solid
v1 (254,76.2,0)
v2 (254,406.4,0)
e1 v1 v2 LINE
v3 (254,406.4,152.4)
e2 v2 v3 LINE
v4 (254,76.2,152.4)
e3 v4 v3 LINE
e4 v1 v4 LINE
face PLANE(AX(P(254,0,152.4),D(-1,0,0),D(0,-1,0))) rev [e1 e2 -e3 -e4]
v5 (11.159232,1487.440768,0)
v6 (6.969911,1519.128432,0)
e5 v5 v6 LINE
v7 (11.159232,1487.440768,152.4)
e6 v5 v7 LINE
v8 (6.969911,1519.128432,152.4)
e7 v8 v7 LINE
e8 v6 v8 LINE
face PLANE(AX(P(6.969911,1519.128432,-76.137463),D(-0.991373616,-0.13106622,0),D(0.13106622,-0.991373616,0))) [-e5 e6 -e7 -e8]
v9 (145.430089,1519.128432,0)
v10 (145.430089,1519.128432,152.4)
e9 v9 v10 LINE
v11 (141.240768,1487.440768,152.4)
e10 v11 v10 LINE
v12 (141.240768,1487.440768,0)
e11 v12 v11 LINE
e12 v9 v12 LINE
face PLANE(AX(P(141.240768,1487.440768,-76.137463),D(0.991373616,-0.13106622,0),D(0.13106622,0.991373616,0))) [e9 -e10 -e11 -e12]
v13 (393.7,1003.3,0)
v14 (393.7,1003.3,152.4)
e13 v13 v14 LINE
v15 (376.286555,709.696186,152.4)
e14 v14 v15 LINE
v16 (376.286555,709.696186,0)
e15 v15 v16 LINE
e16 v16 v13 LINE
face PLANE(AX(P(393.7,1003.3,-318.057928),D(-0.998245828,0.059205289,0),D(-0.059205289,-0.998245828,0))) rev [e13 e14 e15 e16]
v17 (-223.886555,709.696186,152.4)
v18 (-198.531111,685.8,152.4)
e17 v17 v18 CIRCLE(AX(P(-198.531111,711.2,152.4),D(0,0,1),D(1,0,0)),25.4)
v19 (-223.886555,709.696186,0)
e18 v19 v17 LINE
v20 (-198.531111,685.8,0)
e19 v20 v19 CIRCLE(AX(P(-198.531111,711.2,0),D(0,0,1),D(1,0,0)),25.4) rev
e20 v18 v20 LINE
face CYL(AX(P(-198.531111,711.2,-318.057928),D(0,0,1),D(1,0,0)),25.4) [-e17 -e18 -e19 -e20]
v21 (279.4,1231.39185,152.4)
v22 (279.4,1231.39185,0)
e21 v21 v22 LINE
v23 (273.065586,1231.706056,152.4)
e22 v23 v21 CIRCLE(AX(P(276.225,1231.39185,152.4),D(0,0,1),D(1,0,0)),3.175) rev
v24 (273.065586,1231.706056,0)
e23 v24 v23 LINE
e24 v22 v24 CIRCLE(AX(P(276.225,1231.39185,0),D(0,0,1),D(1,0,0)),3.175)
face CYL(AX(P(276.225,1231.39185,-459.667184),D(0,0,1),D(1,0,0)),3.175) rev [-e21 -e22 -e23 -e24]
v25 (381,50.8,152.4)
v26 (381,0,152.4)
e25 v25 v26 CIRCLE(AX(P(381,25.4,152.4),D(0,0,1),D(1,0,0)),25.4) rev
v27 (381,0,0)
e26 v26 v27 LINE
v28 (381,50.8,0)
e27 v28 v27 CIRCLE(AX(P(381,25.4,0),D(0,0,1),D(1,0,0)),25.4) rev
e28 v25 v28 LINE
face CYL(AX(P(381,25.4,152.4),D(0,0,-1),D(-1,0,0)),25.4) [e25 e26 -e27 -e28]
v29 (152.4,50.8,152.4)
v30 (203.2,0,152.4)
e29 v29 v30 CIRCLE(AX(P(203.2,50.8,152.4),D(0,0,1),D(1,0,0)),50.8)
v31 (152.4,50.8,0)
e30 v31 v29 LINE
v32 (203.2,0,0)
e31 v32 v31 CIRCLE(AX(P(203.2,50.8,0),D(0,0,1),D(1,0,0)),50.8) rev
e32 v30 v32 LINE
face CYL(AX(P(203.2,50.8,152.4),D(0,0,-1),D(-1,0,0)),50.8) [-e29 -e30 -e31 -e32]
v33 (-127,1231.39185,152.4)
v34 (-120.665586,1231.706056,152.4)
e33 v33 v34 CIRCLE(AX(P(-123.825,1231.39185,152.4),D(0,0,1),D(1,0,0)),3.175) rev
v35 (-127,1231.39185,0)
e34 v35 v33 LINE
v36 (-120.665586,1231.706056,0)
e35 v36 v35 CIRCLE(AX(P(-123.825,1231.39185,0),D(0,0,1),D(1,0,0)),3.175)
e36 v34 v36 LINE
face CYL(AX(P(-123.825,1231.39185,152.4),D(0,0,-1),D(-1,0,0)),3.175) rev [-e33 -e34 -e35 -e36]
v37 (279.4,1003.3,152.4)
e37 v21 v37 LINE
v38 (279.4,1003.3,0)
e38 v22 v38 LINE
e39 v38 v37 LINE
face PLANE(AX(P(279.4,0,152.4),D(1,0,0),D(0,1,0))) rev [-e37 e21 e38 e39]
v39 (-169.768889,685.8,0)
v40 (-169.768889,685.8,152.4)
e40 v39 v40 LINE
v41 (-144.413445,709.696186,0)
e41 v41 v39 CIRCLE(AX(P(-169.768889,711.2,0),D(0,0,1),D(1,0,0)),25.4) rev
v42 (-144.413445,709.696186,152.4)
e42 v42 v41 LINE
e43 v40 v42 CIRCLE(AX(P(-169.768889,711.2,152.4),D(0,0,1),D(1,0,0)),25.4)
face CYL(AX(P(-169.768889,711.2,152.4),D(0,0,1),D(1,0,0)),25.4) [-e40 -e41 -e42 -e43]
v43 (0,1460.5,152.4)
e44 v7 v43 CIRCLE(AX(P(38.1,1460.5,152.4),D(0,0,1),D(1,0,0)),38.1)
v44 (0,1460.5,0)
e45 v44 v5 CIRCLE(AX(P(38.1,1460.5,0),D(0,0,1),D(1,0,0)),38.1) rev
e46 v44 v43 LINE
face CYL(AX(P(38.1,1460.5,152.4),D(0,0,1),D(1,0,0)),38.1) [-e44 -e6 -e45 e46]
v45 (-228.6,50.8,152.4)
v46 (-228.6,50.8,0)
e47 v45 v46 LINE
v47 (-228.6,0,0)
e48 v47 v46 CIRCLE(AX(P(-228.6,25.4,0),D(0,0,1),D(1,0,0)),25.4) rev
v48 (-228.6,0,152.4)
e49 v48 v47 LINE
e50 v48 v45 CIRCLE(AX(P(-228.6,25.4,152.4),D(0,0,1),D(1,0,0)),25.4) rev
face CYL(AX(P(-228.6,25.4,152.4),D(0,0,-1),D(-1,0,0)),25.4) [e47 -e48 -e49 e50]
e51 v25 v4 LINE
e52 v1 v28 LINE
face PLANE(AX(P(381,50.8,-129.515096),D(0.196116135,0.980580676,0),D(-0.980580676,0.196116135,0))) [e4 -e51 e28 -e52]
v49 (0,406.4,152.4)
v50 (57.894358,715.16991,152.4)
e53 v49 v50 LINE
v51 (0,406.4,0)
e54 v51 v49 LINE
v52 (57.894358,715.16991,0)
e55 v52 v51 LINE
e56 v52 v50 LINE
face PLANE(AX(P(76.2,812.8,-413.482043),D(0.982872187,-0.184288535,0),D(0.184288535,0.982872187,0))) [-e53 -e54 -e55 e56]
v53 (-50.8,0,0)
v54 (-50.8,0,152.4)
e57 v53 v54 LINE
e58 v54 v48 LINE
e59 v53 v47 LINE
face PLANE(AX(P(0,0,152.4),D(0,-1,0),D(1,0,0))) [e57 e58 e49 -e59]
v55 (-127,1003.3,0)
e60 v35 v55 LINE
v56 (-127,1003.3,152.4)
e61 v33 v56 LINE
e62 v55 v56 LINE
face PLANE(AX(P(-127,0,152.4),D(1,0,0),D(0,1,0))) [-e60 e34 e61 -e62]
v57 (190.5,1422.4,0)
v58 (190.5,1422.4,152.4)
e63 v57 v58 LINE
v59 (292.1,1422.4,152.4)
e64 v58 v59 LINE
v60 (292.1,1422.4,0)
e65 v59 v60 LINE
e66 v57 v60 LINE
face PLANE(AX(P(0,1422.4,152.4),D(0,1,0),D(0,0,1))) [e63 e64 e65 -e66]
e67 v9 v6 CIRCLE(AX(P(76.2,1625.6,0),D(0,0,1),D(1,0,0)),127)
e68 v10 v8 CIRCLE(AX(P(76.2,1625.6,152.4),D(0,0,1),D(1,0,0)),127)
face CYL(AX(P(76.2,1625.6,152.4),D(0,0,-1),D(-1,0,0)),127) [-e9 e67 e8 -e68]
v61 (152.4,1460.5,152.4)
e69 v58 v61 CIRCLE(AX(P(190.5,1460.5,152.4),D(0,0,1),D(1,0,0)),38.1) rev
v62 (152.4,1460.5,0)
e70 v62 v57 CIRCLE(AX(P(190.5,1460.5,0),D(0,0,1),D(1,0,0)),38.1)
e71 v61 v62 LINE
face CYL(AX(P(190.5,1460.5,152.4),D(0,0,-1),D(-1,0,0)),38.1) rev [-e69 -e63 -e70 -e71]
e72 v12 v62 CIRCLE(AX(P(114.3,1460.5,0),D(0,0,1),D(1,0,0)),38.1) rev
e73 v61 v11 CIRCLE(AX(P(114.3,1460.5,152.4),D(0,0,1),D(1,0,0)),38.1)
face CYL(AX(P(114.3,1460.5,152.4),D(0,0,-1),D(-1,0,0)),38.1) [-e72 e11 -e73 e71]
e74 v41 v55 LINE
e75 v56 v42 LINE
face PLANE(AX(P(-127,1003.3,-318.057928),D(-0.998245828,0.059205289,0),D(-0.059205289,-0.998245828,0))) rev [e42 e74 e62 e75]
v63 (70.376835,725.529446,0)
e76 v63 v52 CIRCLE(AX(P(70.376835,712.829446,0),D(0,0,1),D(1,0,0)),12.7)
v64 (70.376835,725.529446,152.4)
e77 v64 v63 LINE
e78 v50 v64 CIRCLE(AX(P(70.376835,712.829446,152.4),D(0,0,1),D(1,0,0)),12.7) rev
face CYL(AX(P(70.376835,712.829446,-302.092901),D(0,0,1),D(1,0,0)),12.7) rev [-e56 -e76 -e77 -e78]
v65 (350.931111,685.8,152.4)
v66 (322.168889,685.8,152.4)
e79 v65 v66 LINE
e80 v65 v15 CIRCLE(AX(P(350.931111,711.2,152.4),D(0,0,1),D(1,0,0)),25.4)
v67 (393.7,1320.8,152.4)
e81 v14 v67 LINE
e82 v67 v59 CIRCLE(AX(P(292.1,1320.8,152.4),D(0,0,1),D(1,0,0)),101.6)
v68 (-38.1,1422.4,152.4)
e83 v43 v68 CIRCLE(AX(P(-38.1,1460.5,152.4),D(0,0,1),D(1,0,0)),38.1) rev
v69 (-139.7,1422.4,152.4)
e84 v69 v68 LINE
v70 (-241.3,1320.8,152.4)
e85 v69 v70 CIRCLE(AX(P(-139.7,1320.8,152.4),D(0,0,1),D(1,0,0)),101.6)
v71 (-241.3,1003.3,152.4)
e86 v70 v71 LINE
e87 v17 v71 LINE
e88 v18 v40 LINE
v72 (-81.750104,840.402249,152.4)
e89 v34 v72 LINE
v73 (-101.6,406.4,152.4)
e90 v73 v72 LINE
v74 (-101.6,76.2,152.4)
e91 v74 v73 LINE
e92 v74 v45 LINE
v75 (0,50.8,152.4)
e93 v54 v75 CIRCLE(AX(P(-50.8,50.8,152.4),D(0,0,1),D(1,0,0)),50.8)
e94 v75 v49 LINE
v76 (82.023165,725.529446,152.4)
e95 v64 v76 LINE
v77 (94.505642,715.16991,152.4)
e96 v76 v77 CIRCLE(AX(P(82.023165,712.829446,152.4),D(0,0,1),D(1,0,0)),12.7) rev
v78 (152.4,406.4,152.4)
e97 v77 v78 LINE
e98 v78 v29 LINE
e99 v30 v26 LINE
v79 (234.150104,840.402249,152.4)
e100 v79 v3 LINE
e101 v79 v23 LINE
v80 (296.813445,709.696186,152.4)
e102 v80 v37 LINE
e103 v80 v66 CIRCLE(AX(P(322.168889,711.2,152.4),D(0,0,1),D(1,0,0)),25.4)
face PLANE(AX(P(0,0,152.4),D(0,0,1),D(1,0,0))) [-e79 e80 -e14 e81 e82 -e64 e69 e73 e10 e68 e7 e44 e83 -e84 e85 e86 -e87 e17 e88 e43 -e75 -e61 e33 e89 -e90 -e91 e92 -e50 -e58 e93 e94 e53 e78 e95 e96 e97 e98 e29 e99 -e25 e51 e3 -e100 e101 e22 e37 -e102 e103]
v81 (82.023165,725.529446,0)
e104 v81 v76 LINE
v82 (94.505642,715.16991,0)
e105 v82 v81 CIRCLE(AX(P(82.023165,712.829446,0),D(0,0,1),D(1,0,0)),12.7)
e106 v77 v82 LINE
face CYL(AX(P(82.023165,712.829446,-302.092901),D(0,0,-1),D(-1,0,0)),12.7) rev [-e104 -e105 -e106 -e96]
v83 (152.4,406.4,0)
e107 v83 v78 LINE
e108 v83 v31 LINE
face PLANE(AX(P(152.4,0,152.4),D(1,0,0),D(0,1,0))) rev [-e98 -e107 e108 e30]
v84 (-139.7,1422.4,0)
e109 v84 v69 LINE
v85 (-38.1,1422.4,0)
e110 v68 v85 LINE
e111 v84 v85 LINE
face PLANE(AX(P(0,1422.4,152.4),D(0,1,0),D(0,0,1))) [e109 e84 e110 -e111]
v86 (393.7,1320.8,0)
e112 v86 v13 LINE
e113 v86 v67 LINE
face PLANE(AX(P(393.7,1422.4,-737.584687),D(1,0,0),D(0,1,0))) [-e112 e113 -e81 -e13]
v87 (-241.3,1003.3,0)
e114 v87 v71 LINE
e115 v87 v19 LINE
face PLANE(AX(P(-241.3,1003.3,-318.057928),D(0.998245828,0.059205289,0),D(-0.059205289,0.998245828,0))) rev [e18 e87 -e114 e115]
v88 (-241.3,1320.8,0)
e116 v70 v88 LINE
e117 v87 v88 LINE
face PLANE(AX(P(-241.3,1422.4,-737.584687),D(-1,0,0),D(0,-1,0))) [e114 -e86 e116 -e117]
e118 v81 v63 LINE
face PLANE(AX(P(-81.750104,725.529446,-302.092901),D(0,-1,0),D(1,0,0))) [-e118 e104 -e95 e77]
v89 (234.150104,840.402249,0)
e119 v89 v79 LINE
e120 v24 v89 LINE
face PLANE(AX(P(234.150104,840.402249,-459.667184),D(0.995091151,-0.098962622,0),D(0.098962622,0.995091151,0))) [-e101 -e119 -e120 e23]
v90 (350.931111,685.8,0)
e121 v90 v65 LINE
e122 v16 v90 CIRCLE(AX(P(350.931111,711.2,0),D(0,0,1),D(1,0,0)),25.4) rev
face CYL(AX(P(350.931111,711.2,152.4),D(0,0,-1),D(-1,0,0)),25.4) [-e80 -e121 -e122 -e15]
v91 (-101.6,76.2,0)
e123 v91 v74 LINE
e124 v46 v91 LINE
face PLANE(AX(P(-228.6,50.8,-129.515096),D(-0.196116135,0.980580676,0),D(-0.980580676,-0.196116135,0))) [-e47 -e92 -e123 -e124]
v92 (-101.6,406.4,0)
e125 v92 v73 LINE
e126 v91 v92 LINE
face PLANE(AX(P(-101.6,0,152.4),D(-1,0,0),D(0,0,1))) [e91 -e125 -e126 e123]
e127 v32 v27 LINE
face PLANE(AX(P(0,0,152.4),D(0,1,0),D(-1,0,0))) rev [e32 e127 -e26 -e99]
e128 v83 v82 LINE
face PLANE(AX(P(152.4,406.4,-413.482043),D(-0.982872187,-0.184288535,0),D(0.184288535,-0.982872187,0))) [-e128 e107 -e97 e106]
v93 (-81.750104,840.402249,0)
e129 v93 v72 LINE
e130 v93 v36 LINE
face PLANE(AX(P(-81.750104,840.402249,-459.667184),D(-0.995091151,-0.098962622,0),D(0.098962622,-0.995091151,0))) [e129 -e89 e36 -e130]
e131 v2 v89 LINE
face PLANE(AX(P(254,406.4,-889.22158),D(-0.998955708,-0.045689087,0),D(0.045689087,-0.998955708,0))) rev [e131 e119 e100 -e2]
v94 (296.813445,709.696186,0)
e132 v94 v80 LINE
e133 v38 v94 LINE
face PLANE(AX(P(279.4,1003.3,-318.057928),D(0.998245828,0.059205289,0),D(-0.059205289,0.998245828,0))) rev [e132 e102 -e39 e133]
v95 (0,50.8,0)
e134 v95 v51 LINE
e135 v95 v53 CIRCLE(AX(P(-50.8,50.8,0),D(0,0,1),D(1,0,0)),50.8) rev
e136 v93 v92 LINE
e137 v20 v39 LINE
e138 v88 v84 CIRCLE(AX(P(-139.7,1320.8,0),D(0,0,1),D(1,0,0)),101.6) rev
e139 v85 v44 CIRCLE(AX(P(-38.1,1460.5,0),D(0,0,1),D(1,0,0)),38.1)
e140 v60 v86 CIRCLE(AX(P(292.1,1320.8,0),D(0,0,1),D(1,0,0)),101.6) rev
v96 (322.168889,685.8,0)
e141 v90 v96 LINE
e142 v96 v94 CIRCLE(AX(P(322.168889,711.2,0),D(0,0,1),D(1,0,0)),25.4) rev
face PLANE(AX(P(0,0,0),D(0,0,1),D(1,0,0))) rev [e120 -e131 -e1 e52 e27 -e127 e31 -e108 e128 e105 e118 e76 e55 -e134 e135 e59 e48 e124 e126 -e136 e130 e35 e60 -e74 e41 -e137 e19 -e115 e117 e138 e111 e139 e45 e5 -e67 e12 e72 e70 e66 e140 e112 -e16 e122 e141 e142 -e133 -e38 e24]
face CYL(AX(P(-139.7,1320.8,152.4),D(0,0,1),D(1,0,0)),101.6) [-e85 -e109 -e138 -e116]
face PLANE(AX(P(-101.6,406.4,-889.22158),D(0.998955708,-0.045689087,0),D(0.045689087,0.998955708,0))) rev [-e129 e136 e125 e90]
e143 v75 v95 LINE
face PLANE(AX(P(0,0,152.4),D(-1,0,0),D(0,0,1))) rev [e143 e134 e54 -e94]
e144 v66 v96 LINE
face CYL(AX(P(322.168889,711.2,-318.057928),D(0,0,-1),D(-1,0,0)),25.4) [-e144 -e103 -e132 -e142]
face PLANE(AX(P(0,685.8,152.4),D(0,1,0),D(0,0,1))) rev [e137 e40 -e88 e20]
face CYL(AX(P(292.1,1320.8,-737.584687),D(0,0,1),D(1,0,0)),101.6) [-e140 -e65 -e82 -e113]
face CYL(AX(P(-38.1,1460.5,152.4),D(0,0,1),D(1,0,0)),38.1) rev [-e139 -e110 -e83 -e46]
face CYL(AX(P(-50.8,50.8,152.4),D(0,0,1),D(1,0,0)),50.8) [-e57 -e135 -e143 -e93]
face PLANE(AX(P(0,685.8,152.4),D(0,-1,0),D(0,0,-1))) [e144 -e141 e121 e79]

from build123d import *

# Parameters (mm, degrees)
SKETCH1_R            = 127
SKETCH1_W            = 76.2
SKETCH1_H            = 660.4
SKETCH1_W_2          = 101.6
SKETCH1_H_2          = 762
SKETCH1_W_3          = 228.6
SKETCH1_H_3          = 50.8
SKETCH1_W_4          = 152.4
SKETCH1_H_4          = 76.2
BOSS_EXTRUDE1_DEPTH  = 152.4
SKETCH2_W            = 406.4
SKETCH2_H            = 50.8
BOSS_EXTRUDE2_DEPTH  = 152.4
BOSS_EXTRUDE3_DEPTH  = 152.4
BOSS_EXTRUDE4_DEPTH  = 152.4
BOSS_EXTRUDE5_DEPTH  = 152.4
CUT_EXTRUDE1_DEPTH   = 152.4
SKETCH7_W            = 279.4
SKETCH7_H            = 114.872803244
BOSS_EXTRUDE6_DEPTH  = 152.4
BOSS_EXTRUDE7_DEPTH  = 152.4
SKETCH9_W            = 38.1
SKETCH9_H            = 736.6
BOSS_EXTRUDE8_DEPTH  = 152.4
FILLET2_R            = 101.6
CUT_EXTRUDE2_DEPTH   = 152.4
FILLET3_R            = 50.8
FILLET5_START        = -1
FILLET5_DEPTH        = 154
FILLET5_2_DEPTH      = 152.4
FILLET6_R            = 12.7
FILLET7_R            = 25.4
FILLET8_R            = 3.175
BOSS_EXTRUDE9_DEPTH  = 152.4
BOSS_EXTRUDE10_DEPTH = 152.4


with BuildPart() as part:
    # Sketch1 → Boss-Extrude1 (new body)
    with BuildSketch(Plane.XY):
        with Locations(Location((76.2, 1625.6, 0), (0, 0, 180))):
            Circle(SKETCH1_R)
        Polygon((-101.6, 812.8), (0, 812.8), (152.4, 812.8), (254, 812.8), (254, 1346.2), (254, 1422.4), (152.4, 1422.4), (0, 1422.4), (-101.6, 1422.4), (-101.6, 1346.2), align=None)
        Polygon((-127, 1346.2), (-101.6, 1346.2), (-101.6, 1422.4), (-203.2, 1422.4), (-203.2, 1346.2), align=None)
        with Locations((-165.1, 1016)):
            Rectangle(SKETCH1_W, SKETCH1_H)
        Polygon((254, 1422.4), (254, 1346.2), (279.4, 1346.2), (355.6, 1346.2), (355.6, 1422.4), align=None)
        with Locations((317.5, 1016)):
            Rectangle(SKETCH1_W, SKETCH1_H)
        with Locations((203.2, 431.8)):
            Rectangle(SKETCH1_W_2, SKETCH1_H_2)
        with Locations((-50.8, 431.8)):
            Rectangle(SKETCH1_W_2, SKETCH1_H_2)
        with Locations((-114.3, 25.4)):
            Rectangle(SKETCH1_W_3, SKETCH1_H_3)
        Polygon((254, 50.8), (152.4, 50.8), (152.4, 0), (381, 0), (381, 50.8), align=None)
        with BuildLine():
            ThreePointArc((381, 50.8), (406.4, 25.4), (381, 0))
            Line((381, 0), (381, 50.8))
        make_face()
        with BuildLine():
            ThreePointArc((-228.6, 0), (-254, 25.4), (-228.6, 50.8))
            Line((-228.6, 50.8), (-228.6, 0))
        make_face()
        with Locations((76.2, 1460.5)):
            Rectangle(SKETCH1_W_4, SKETCH1_H_4)
    extrude(amount=BOSS_EXTRUDE1_DEPTH)

    # Sketch2 → Boss-Extrude2 (add)
    with BuildSketch(Plane.XY.offset(152.4)):
        with Locations((76.2, 1320.8)):
            Rectangle(SKETCH2_W, SKETCH2_H)
    extrude(amount=-BOSS_EXTRUDE2_DEPTH)

    # Sketch3 → Boss-Extrude3 (add)
    with BuildSketch(Plane.XY.offset(152.4)):
        Polygon((76.2, 812.8), (0, 406.4), (0, 812.8), align=None)
    extrude(amount=-BOSS_EXTRUDE3_DEPTH)

    # Sketch4 → Boss-Extrude4 (add)
    with BuildSketch(Plane.XY.offset(152.4)):
        Polygon((76.2, 812.8), (152.4, 812.8), (152.4, 406.4), align=None)
    extrude(amount=-BOSS_EXTRUDE4_DEPTH)

    # Sketch5 → Boss-Extrude5 (add)
    with BuildSketch(Plane.XY.offset(152.4)):
        Polygon((-228.6, 50.8), (-101.6, 76.2), (-101.6, 50.8), align=None)
        Polygon((254, 76.2), (254, 50.8), (381, 50.8), align=None)
    extrude(amount=-BOSS_EXTRUDE5_DEPTH)

    # Sketch6 → Cut-Extrude1 (cut)
    with BuildSketch(Plane.XY.offset(152.4)):
        Polygon((-101.6, 406.4), (-81.750104461, 840.402248986), (-101.6, 1295.4), align=None)
        Polygon((254, 406.4), (234.150104461, 840.402248986), (254, 1295.4), align=None)
    extrude(amount=-CUT_EXTRUDE1_DEPTH, mode=Mode.SUBTRACT)

    # Sketch7 → Boss-Extrude6 (add)
    with BuildSketch(Plane.XY.offset(152.4)):
        with Locations((57.949895539, 782.965847364)):
            Rectangle(SKETCH7_W, SKETCH7_H)
    extrude(amount=-BOSS_EXTRUDE6_DEPTH)

    # Sketch8 → Boss-Extrude7 (add)
    with BuildSketch(Plane.XY.offset(152.4)):
        Polygon((-81.750104461, 840.402248986), (-127, 1295.4), (-61.647363893, 1295.4), align=None)
        Polygon((214.047363893, 1295.4), (234.150104461, 840.402248986), (279.4, 1295.4), align=None)
    extrude(amount=-BOSS_EXTRUDE7_DEPTH)

    # Sketch9 → Boss-Extrude8 (add)
    with BuildSketch(Plane.XY.offset(152.4)):
        with Locations((-222.25, 1054.1)):
            Rectangle(SKETCH9_W, SKETCH9_H)
        with Locations((374.65, 1054.1)):
            Rectangle(SKETCH9_W, SKETCH9_H)
    extrude(amount=-BOSS_EXTRUDE8_DEPTH)

    # Fillet2
    fillet2_edges = [part.edges().sort_by_distance(p)[0] for p in [
        (-241.3, 1422.4, 76.2),
        (393.7, 1422.4, 76.2),
    ]]
    fillet(fillet2_edges, radius=FILLET2_R)

    # Sketch10 → Cut-Extrude2 (cut)
    with BuildSketch(Plane.XY.offset(152.4)):
        Polygon((-241.3, 1003.3), (-222.469288436, 685.8), (-241.3, 685.8), align=None)
        Polygon((-145.830711564, 685.8), (-127, 685.8), (-127, 1003.3), align=None)
        Polygon((279.4, 1003.3), (298.230711564, 685.8), (279.4, 685.8), align=None)
        Polygon((374.869288436, 685.8), (393.7, 685.8), (393.7, 1003.3), align=None)
    extrude(amount=-CUT_EXTRUDE2_DEPTH, mode=Mode.SUBTRACT)

    # Fillet3
    fillet3_edges = [part.edges().sort_by_distance(p)[0] for p in [
        (152.4, 0, 76.2),
        (0, 0, 76.2),
    ]]
    fillet(fillet3_edges, radius=FILLET3_R)

    # Fillet5: read off the stored shape, not the designer's step
    # Fillet5 outline → Fillet5 (cut)
    with BuildSketch(Plane.XY.offset(FILLET5_START)):
        with BuildLine():
            ThreePointArc((0, 1460.5), (11.159231637, 1487.440768363), (38.1, 1498.6))
            Line((38.1, 1498.6), (0, 1498.6))
            Line((0, 1498.6), (0, 1460.5))
        make_face()
        with BuildLine():
            ThreePointArc((114.3, 1498.6), (141.240768363, 1487.440768363), (152.4, 1460.5))
            Line((152.4, 1460.5), (152.4, 1498.6))
            Line((152.4, 1498.6), (114.3, 1498.6))
        make_face()
    extrude(amount=FILLET5_DEPTH, mode=Mode.SUBTRACT)

    # Fillet5 2 outline → Fillet5 2 (add)
    with BuildSketch(Plane.XY):
        with BuildLine():
            Line((152.4, 1422.4), (190.5, 1422.4))
            ThreePointArc((190.5, 1422.4), (163.559231637, 1433.559231637), (152.4, 1460.5))
            Line((152.4, 1460.5), (152.4, 1422.4))
        make_face()
        with BuildLine():
            Line((0, 1422.4), (0, 1460.5))
            ThreePointArc((0, 1460.5), (-11.159231637, 1433.559231637), (-38.1, 1422.4))
            Line((-38.1, 1422.4), (0, 1422.4))
        make_face()
    extrude(amount=FILLET5_2_DEPTH)

    # Fillet6
    fillet6_edges = [part.edges().sort_by_distance(p)[0] for p in [
        (92.563228923, 725.529445742, 76.2),
        (59.836771077, 725.529445742, 76.2),
    ]]
    fillet(fillet6_edges, radius=FILLET6_R)

    # Fillet7
    fillet7_edges = [part.edges().sort_by_distance(p)[0] for p in [
        (-222.469288436, 685.8, 76.2),
        (-145.830711564, 685.8, 76.2),
        (298.230711564, 685.8, 76.2),
        (374.869288436, 685.8, 76.2),
    ]]
    fillet(fillet7_edges, radius=FILLET7_R)

    # Fillet8
    fillet8_edges = [part.edges().sort_by_distance(p)[0] for p in [
        (279.4, 1295.4, 76.2),
        (-127, 1295.4, 76.2),
    ]]
    fillet(fillet8_edges, radius=FILLET8_R)

    # Sketch11 → Boss-Extrude9 (add)
    with BuildSketch(Plane.XY.offset(152.4)):
        Polygon((6.96991061, 1519.128432325), (11.159231637, 1487.440768363), (76.2, 1498.6), align=None)
    extrude(amount=-BOSS_EXTRUDE9_DEPTH)

    # Sketch12 → Boss-Extrude10 (add)
    with BuildSketch(Plane.XY.offset(152.4)):
        Polygon((145.43008939, 1519.128432325), (76.2, 1498.6), (141.240768363, 1487.440768363), align=None)
    extrude(amount=-BOSS_EXTRUDE10_DEPTH)


solid = part.part
